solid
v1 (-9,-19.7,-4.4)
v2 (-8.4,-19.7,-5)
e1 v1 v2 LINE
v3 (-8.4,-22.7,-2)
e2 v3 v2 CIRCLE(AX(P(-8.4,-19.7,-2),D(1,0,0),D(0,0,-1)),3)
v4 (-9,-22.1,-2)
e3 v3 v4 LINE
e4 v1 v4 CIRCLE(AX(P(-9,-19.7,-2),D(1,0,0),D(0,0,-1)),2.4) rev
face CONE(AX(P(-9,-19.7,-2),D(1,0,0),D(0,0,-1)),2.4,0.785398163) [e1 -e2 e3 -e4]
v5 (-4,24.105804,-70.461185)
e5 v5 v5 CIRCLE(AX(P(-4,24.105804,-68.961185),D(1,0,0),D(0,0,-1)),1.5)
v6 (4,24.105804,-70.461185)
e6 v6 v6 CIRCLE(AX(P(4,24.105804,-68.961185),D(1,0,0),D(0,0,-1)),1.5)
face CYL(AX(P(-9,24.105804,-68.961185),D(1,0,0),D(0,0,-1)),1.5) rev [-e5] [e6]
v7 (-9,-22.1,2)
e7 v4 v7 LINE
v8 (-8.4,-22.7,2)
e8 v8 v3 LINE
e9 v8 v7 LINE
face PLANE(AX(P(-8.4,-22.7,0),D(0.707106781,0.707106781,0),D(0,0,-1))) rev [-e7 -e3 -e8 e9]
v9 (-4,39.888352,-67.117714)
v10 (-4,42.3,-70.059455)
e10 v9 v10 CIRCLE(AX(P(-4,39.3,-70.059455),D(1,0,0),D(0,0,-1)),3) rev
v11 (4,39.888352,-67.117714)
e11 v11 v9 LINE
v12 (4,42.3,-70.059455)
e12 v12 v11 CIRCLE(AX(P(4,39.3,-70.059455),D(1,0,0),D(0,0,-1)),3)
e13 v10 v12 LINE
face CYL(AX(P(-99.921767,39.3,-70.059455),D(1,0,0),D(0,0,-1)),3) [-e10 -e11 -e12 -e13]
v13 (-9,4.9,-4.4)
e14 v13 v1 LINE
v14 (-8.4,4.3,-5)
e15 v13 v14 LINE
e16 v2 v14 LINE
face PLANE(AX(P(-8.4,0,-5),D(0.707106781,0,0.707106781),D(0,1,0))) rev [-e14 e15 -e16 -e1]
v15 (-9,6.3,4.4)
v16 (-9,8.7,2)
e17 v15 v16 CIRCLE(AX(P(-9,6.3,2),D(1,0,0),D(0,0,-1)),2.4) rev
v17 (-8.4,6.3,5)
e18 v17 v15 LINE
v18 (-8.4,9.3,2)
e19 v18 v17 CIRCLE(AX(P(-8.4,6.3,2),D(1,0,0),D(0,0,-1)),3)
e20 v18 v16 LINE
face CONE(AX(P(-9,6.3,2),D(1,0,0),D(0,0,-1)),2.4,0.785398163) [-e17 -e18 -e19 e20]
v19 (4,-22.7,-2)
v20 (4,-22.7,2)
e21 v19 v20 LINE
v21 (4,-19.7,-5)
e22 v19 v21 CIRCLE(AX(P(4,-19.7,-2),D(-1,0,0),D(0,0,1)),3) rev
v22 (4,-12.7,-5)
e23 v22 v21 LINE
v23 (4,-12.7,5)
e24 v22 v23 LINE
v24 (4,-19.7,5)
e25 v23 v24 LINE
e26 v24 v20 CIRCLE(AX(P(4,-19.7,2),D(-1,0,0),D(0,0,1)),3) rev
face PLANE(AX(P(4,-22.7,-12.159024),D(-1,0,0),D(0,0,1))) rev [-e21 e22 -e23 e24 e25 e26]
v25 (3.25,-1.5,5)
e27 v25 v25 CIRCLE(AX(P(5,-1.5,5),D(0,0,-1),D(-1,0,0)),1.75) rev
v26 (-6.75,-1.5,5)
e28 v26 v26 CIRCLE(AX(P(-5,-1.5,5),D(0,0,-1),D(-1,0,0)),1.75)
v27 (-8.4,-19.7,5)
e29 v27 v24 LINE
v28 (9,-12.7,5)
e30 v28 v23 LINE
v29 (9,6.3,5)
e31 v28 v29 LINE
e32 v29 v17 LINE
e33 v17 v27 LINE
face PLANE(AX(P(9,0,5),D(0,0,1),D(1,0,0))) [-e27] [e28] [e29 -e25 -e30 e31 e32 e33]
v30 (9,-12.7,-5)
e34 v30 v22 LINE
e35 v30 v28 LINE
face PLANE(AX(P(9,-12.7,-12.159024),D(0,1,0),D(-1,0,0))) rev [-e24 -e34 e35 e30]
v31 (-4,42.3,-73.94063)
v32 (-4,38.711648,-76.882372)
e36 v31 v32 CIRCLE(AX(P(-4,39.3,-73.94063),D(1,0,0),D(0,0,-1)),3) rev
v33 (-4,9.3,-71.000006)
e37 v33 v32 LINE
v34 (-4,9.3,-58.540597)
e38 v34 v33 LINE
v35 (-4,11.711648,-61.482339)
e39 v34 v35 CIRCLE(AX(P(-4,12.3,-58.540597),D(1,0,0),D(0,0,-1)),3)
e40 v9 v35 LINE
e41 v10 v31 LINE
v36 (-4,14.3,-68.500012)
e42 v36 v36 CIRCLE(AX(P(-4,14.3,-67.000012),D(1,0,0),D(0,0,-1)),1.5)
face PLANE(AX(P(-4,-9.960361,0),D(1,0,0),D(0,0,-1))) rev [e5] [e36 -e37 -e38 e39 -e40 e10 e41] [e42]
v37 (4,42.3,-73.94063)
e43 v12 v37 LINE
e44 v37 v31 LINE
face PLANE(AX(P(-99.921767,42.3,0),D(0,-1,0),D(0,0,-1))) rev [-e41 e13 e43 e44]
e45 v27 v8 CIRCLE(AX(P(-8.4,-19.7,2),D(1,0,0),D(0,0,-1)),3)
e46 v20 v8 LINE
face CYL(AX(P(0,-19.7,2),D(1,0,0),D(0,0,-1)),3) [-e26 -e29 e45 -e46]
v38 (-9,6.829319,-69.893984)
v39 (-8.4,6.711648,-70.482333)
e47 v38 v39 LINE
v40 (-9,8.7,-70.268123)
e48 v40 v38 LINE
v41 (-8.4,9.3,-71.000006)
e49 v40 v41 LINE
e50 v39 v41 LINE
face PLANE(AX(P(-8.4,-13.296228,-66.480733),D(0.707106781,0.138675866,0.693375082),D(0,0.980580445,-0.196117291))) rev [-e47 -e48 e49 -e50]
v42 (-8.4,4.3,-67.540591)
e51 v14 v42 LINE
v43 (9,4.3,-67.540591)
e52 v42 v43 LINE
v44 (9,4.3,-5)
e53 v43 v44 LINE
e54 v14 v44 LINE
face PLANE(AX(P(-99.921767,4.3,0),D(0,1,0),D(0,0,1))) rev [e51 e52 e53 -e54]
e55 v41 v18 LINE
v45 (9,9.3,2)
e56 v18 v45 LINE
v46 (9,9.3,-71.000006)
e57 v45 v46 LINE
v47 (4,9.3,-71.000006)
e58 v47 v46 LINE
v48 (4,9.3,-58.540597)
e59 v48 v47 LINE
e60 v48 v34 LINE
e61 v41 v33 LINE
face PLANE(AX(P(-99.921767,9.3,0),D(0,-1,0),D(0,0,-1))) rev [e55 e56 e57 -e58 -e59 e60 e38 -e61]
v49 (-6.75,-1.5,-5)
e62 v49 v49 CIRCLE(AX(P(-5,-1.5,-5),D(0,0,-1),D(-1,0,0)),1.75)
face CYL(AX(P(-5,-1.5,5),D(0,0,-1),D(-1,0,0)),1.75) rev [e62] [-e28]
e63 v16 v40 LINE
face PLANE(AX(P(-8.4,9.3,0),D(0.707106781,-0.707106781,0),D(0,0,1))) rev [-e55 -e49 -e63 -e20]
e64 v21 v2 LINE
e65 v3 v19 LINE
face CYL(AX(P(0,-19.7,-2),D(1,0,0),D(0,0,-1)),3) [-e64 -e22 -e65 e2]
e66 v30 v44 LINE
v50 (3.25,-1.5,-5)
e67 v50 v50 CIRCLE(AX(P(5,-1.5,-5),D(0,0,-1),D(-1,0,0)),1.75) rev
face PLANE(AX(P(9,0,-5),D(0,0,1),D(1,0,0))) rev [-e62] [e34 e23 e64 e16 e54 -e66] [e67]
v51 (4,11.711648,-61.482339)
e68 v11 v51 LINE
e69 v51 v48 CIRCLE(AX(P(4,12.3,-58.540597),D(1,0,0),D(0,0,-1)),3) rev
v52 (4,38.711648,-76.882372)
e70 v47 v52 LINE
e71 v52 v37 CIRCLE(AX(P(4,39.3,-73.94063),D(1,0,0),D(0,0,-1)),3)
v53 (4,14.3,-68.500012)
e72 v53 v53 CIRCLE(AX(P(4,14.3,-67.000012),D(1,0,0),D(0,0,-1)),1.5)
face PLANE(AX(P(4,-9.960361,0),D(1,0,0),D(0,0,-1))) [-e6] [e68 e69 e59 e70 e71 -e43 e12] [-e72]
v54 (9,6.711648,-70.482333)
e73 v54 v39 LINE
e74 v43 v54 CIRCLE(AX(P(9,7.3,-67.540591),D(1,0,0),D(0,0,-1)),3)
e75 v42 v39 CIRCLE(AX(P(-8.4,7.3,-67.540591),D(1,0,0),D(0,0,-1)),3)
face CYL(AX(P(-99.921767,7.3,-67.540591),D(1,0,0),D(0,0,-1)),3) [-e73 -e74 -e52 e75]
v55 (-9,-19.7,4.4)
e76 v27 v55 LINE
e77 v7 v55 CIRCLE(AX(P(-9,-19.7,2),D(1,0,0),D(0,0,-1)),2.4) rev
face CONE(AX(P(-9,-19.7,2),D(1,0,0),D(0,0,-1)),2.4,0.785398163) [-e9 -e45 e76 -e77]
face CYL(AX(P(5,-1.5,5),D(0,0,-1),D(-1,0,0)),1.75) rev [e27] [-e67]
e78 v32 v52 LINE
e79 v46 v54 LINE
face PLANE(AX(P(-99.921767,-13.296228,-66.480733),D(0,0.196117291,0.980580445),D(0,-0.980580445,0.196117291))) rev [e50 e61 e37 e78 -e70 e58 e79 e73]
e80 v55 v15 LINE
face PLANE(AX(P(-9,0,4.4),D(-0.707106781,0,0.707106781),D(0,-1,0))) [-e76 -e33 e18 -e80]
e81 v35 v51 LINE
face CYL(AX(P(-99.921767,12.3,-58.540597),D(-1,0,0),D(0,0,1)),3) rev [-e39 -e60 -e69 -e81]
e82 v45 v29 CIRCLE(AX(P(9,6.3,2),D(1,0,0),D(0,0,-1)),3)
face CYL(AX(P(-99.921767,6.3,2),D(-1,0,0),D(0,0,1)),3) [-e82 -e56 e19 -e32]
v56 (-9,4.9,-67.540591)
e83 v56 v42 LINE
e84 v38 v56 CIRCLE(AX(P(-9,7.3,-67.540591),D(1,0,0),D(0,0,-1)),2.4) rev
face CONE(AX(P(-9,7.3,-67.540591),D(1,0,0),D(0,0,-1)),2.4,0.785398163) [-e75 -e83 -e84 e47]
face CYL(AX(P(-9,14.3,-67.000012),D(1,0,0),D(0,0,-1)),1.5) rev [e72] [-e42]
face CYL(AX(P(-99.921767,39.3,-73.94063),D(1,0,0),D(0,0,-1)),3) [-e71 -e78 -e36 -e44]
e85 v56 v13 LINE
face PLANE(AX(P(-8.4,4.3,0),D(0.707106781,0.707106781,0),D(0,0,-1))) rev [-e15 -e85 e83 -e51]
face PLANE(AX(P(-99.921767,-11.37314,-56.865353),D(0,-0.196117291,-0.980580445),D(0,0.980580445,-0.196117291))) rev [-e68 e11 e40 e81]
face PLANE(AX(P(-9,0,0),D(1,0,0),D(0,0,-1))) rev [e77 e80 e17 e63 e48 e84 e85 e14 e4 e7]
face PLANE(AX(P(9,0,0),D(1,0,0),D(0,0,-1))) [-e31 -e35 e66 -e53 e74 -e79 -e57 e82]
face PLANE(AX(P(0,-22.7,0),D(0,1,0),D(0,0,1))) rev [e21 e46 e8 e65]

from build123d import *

# Parameters (mm, degrees)
EXTRUDE_1_DEPTH     = 9
CUT_EXTRUDE_1_DEPTH = 5
SKETCH_3_R          = 1.75
CUT_EXTRUDE_2_DEPTH = 50.647599136312735
SKETCH_4_W          = 3.000000000000001
SKETCH_4_H          = 19.851507449534697
EXTRUDE_2_DEPTH     = 5.5
FILLET_2_R          = 5
FILLET_3_R          = 5
SKETCH_6_W          = 18
SKETCH_6_H          = 10.000000000000004
EXTRUDE_3_DEPTH     = 16.2
CUT_EXTRUDE_5_DEPTH = 52.567649463300064
CUT_EXTRUDE_6_DEPTH = 53.49411618001278
EXTRUDE_4_DEPTH     = 18
SKETCH_11_W         = 4.999999999999995
SKETCH_11_H         = 18.60004044786868
CUT_EXTRUDE_7_DEPTH = 33
SKETCH_12_R         = 1.4999999999999973
CUT_EXTRUDE_8_DEPTH = 90.33116605445798
FILLET_4_R          = 3
CHAMFER_3_SIZE      = 0.6


# Some blends are built 0.0001 mm under size
with BuildPart() as part:
    # ｽｹｯﾁ1 → ﾎﾞｽ - 押し出し1 (new, symmetric)
    with BuildSketch(Plane(origin=(0, 0, 0), x_dir=(0, 0, -1), z_dir=(1, 0, 0))):
        Polygon((-5.0000000000000036, -6.499999999999999), (5.0000000000000036, -6.499999999999999), (5.0000000000000036, 6.499999999999999), (13.25805060886326, 47.79), (3.2580506088632593, 47.79), (-5.0000000000000036, 6.500000000000001), align=None)
    extrude(amount=EXTRUDE_1_DEPTH, both=True)

    # ｽｹｯﾁ2 → ｶｯﾄ - 押し出し1 (cut)
    with BuildSketch(Plane(origin=(9, 0, 0), x_dir=(0, 0, -1), z_dir=(1, 0, 0))):
        Polygon((3.2580506088632593, 47.790000000000006), (-1.10677614066039, 25.966000000000005), (8.50860394182422, 24.04291219799919), (13.258050608863256, 47.790000000000006), align=None)
    cut_extrude_1 = extrude(amount=-CUT_EXTRUDE_1_DEPTH, mode=Mode.SUBTRACT)

    # ﾐﾗｰ1: ｶｯﾄ - 押し出し1 across plane
    add(cut_extrude_1.mirror(Plane(origin=(0, 0, 0), x_dir=(0, 0, 1), z_dir=(1, 0, 0))), mode=Mode.SUBTRACT)

    # ｽｹｯﾁ3 → ｶｯﾄ - 押し出し2 (cut, through all)
    with BuildSketch(Plane(origin=(0, 0, -5.0000000000000036), x_dir=(-1, 0, 0), z_dir=(0, 0, -1))):
        with Locations((5, -1.4999999999999987)):
            Circle(SKETCH_3_R)
        with Locations((-5, -1.4999999999999987)):
            Circle(SKETCH_3_R)
    extrude(amount=-CUT_EXTRUDE_2_DEPTH, mode=Mode.SUBTRACT)

    # ｽｹｯﾁ4 → ﾎﾞｽ - 押し出し2 (add)
    with BuildSketch(Plane(origin=(0, 1.2115468473854123, 6.057697112542844), x_dir=(1, 0, 0), z_dir=(0, 0.19611729080206414, 0.980580444557436))):
        with Locations((7.5, 15.318940160380402)):
            Rectangle(SKETCH_4_W, SKETCH_4_H)
        Polygon((-8.99999999999999, 5.393186435613051), (-8.999999999999993, 25.24469388514775), (-5.999999999999994, 25.244693885147754), (-5.9999999999999885, 5.393186435613052), align=None)
    extrude(amount=EXTRUDE_2_DEPTH)

    # ﾌｨﾚｯﾄ2
    # the kernel refuses this fillet: 5 mm, written as the material it takes off along each edge
    with BuildSketch(Plane(origin=(-19.247567109880233, 47.79, -13.25805060886326), x_dir=(0, -0.9805804445574373, 0.19611729080205748), z_dir=(1, 0, 0))) as fillet_2_piece_1:
        with BuildLine():
            CenterArc((FILLET_2_R * 1.21980536879, -FILLET_2_R), FILLET_2_R, 90.00000000000003, 101.30999999999938)
            Line((FILLET_2_R * 0.239224924233, -FILLET_2_R * 1.1961172908), (0, 0))
            Line((0, 0), (FILLET_2_R * 1.21980536879, 2e-17))
        make_face()
    extrude(amount=38.495134219760466, mode=Mode.SUBTRACT)
    with BuildSketch(Plane(origin=(14.247536467555662, 47.79, -3.2580506088632593), x_dir=(0, 0, -1), z_dir=(-1, 0, 0))) as fillet_2_piece_2:
        with BuildLine():
            CenterArc((FILLET_2_R * 0.819802917404, FILLET_2_R), FILLET_2_R, 191.30999999999946, 78.69000000000051)
            Line((-FILLET_2_R * 0.160777527153, FILLET_2_R * 0.803882709198), (0, 0))
            Line((0, 0), (FILLET_2_R * 0.819802917404, 0))
        make_face()
    extrude(amount=28.495072935111324, mode=Mode.SUBTRACT)

    # ﾌｨﾚｯﾄ3
    fillet_3_edges = [part.edges().sort_by_distance(p)[0] for p in [
        (-4, 25.004456098999597, -3.7009139005819147),
        (4, 25.004456098999597, -3.7009139005819147),
    ]]
    fillet(fillet_3_edges, radius=FILLET_3_R - 0.0001)  # a hair under: the kernel refuses the full size

    # 面取り2
    # the kernel refuses this chamfer: 1 mm, written as the material it takes off along each edge
    with BuildSketch(Plane(origin=(9, 23.43957972269821, -11.525247830932894), x_dir=(-0.9850292351397439, 0.16903968557305887, -0.0338081443053687), z_dir=(0, 0.19611729080206025, 0.9805804445574368))) as chamfer_2_piece_1:
        with BuildLine():
            Line((1.2305543745450382, 1e-17), (-0.4179125111005865, 1.157416606835036))
            Line((-0.4179125111005865, 1.157416606835036), (-0.5656668963715484, 1.1315585010807419))
            ThreePointArc((-0.5656668963715484, 1.1315585010807419), (-0.2522325130461084, 0.5711346395907222), (-0.14775438527096194, -0.02585810575429407))
            Line((-0.14775438527096194, -0.02585810575429407), (0.02585810575429378, -0.14775438527096027))
            ThreePointArc((0.02585810575429378, -0.14775438527096027), (0.6228508510993123, -0.04327625749581342), (1.2564124802993322, -0.14775438527096027))
            Line((1.2564124802993322, -0.14775438527096027), (1.2305543745450382, 1e-17))
        make_face()
    extrude(amount=21.458576318299393, mode=Mode.SUBTRACT)

    # ｽｹｯﾁ6 → ﾎﾞｽ - 押し出し3 (add)
    with BuildSketch(Plane.XZ.offset(6.499999999999999)):
        Rectangle(SKETCH_6_W, SKETCH_6_H)
    extrude(amount=EXTRUDE_3_DEPTH)

    # ｽｹｯﾁ7 → ｶｯﾄ - 押し出し5 (cut, through all)
    with BuildSketch(Plane.XY.offset(5.0000000000000036)):
        Polygon((9, -22.7), (3.9999999999999982, -22.7), (3.9999999999999982, -12.700000000000001), (9, -12.7), align=None)
    extrude(amount=-CUT_EXTRUDE_5_DEPTH, mode=Mode.SUBTRACT)

    # ｽｹｯﾁ8 → ｶｯﾄ - 押し出し6 (cut, through all)
    with BuildSketch(Plane(origin=(9, 0, 0), x_dir=(0, 0, -1), z_dir=(1, 0, 0))):
        Polygon((-14.730367070472871, 56.5), (-14.730367070472871, 6.499999999999999), (-5.0000000000000036, 6.499999999999999), (-10.393192445065868, 7.578645099411347), (-6.696085876528205, 26.064064654853848), (8.31248665102216, 23.062331753441747), (5.0000000000000036, 6.499999999999999), (15.269632929527129, 6.499999999999999), (15.269632929527127, 56.5), align=None)
        Polygon((-10.393192445065868, 7.578645099411347), (-5.0000000000000036, 6.500000000000001), (5.000000000000002, 6.499999999999999), (8.31248665102216, 23.062331753441747), (-6.696085876528205, 26.064064654853848), align=None)
    extrude(amount=-CUT_EXTRUDE_6_DEPTH, mode=Mode.SUBTRACT)

    # ｽｹｯﾁ10 → ﾎﾞｽ - 押し出し4 (add)
    with BuildSketch(Plane(origin=(9, 0, 0), x_dir=(0, 0, -1), z_dir=(1, 0, 0))):
        Polygon((61.000006128464946, 9.300000000000002), (-5.0000000000000036, 9.300000000000002), (-5.0000000000000036, 6.499999999999999), (5.000000000000002, 6.499999999999999), (5.0000000000000036, 4.299999999999994), (69.99999999999999, 4.300000000000002), (77.60004657633361, 42.300000000000004), (67.60004657633361, 42.3), align=None)
    extrude(amount=-EXTRUDE_4_DEPTH)

    # ｽｹｯﾁ11 → ｶｯﾄ - 押し出し7 (cut)
    with BuildSketch(Plane(origin=(0, 42.29999999999995, 2.935e-14), x_dir=(1, 0, 0), z_dir=(0, 1, 0))):
        with Locations((-6.499999999999997, 68.30002635239924)):
            Rectangle(SKETCH_11_W, SKETCH_11_H)
        Polygon((4, 77.60004657633358), (4, 59.0000061284649), (8.999999999999995, 59.0000061284649), (9, 77.60004657633358), align=None)
    extrude(amount=-CUT_EXTRUDE_7_DEPTH, mode=Mode.SUBTRACT)

    # ｽｹｯﾁ12 → ｶｯﾄ - 押し出し8 (cut, through all)
    with BuildSketch(Plane(origin=(4, 0, 0), x_dir=(-5e-17, 0, -1), z_dir=(1, 0, -5e-17))):
        with Locations((68.96118516495055, 24.105804445574364)):
            Circle(SKETCH_12_R)
        with Locations((67.00001225692989, 14.300000000000004)):
            Circle(SKETCH_12_R)
    extrude(amount=-CUT_EXTRUDE_8_DEPTH, mode=Mode.SUBTRACT)

    # ﾌｨﾚｯﾄ4
    fillet_4_edges = [part.edges().sort_by_distance(p)[0] for p in [
        (-2.500000000000001, -22.7, -5.000000000000002),
        (-2.5, -22.7, 5.000000000000002),
        (0, 9.300000000000002, 5.0000000000000036),
        (0, 4.3000000000000025, -69.99999999999999),
        (0, 42.300000000000004, -77.60004657633361),
        (0, 42.3, -67.60004657633361),
        (0, 9.300000000000002, -61.000006128464946),
    ]]
    fillet(fillet_4_edges, radius=FILLET_4_R)

    # 面取り3
    chamfer_3_edges = [part.edges().sort_by_distance(p)[0] for p in [
        (-8.999999999999998, 9.299999999999974, -34.50000306423246),
        (-9, 4.299999999999998, -36.27029562389333),
        (-9, -22.7, 0),
        (-9, 8.005824063796883, -70.74116935496194),
        (-9, -7.700000000000004, -5.000000000000003),
        (-9, -6.699999999999992, 5.000000000000003),
        (-9, 8.421320343559644, 4.1213203435596455),
        (-9, 4.979972455204619, -69.4425565974686),
        (-9, -21.821320343559645, -4.1213203435596455),
        (-9, -21.82132034355964, 4.1213203435596455),
    ]]
    chamfer(chamfer_3_edges, length=CHAMFER_3_SIZE)


solid = part.part
